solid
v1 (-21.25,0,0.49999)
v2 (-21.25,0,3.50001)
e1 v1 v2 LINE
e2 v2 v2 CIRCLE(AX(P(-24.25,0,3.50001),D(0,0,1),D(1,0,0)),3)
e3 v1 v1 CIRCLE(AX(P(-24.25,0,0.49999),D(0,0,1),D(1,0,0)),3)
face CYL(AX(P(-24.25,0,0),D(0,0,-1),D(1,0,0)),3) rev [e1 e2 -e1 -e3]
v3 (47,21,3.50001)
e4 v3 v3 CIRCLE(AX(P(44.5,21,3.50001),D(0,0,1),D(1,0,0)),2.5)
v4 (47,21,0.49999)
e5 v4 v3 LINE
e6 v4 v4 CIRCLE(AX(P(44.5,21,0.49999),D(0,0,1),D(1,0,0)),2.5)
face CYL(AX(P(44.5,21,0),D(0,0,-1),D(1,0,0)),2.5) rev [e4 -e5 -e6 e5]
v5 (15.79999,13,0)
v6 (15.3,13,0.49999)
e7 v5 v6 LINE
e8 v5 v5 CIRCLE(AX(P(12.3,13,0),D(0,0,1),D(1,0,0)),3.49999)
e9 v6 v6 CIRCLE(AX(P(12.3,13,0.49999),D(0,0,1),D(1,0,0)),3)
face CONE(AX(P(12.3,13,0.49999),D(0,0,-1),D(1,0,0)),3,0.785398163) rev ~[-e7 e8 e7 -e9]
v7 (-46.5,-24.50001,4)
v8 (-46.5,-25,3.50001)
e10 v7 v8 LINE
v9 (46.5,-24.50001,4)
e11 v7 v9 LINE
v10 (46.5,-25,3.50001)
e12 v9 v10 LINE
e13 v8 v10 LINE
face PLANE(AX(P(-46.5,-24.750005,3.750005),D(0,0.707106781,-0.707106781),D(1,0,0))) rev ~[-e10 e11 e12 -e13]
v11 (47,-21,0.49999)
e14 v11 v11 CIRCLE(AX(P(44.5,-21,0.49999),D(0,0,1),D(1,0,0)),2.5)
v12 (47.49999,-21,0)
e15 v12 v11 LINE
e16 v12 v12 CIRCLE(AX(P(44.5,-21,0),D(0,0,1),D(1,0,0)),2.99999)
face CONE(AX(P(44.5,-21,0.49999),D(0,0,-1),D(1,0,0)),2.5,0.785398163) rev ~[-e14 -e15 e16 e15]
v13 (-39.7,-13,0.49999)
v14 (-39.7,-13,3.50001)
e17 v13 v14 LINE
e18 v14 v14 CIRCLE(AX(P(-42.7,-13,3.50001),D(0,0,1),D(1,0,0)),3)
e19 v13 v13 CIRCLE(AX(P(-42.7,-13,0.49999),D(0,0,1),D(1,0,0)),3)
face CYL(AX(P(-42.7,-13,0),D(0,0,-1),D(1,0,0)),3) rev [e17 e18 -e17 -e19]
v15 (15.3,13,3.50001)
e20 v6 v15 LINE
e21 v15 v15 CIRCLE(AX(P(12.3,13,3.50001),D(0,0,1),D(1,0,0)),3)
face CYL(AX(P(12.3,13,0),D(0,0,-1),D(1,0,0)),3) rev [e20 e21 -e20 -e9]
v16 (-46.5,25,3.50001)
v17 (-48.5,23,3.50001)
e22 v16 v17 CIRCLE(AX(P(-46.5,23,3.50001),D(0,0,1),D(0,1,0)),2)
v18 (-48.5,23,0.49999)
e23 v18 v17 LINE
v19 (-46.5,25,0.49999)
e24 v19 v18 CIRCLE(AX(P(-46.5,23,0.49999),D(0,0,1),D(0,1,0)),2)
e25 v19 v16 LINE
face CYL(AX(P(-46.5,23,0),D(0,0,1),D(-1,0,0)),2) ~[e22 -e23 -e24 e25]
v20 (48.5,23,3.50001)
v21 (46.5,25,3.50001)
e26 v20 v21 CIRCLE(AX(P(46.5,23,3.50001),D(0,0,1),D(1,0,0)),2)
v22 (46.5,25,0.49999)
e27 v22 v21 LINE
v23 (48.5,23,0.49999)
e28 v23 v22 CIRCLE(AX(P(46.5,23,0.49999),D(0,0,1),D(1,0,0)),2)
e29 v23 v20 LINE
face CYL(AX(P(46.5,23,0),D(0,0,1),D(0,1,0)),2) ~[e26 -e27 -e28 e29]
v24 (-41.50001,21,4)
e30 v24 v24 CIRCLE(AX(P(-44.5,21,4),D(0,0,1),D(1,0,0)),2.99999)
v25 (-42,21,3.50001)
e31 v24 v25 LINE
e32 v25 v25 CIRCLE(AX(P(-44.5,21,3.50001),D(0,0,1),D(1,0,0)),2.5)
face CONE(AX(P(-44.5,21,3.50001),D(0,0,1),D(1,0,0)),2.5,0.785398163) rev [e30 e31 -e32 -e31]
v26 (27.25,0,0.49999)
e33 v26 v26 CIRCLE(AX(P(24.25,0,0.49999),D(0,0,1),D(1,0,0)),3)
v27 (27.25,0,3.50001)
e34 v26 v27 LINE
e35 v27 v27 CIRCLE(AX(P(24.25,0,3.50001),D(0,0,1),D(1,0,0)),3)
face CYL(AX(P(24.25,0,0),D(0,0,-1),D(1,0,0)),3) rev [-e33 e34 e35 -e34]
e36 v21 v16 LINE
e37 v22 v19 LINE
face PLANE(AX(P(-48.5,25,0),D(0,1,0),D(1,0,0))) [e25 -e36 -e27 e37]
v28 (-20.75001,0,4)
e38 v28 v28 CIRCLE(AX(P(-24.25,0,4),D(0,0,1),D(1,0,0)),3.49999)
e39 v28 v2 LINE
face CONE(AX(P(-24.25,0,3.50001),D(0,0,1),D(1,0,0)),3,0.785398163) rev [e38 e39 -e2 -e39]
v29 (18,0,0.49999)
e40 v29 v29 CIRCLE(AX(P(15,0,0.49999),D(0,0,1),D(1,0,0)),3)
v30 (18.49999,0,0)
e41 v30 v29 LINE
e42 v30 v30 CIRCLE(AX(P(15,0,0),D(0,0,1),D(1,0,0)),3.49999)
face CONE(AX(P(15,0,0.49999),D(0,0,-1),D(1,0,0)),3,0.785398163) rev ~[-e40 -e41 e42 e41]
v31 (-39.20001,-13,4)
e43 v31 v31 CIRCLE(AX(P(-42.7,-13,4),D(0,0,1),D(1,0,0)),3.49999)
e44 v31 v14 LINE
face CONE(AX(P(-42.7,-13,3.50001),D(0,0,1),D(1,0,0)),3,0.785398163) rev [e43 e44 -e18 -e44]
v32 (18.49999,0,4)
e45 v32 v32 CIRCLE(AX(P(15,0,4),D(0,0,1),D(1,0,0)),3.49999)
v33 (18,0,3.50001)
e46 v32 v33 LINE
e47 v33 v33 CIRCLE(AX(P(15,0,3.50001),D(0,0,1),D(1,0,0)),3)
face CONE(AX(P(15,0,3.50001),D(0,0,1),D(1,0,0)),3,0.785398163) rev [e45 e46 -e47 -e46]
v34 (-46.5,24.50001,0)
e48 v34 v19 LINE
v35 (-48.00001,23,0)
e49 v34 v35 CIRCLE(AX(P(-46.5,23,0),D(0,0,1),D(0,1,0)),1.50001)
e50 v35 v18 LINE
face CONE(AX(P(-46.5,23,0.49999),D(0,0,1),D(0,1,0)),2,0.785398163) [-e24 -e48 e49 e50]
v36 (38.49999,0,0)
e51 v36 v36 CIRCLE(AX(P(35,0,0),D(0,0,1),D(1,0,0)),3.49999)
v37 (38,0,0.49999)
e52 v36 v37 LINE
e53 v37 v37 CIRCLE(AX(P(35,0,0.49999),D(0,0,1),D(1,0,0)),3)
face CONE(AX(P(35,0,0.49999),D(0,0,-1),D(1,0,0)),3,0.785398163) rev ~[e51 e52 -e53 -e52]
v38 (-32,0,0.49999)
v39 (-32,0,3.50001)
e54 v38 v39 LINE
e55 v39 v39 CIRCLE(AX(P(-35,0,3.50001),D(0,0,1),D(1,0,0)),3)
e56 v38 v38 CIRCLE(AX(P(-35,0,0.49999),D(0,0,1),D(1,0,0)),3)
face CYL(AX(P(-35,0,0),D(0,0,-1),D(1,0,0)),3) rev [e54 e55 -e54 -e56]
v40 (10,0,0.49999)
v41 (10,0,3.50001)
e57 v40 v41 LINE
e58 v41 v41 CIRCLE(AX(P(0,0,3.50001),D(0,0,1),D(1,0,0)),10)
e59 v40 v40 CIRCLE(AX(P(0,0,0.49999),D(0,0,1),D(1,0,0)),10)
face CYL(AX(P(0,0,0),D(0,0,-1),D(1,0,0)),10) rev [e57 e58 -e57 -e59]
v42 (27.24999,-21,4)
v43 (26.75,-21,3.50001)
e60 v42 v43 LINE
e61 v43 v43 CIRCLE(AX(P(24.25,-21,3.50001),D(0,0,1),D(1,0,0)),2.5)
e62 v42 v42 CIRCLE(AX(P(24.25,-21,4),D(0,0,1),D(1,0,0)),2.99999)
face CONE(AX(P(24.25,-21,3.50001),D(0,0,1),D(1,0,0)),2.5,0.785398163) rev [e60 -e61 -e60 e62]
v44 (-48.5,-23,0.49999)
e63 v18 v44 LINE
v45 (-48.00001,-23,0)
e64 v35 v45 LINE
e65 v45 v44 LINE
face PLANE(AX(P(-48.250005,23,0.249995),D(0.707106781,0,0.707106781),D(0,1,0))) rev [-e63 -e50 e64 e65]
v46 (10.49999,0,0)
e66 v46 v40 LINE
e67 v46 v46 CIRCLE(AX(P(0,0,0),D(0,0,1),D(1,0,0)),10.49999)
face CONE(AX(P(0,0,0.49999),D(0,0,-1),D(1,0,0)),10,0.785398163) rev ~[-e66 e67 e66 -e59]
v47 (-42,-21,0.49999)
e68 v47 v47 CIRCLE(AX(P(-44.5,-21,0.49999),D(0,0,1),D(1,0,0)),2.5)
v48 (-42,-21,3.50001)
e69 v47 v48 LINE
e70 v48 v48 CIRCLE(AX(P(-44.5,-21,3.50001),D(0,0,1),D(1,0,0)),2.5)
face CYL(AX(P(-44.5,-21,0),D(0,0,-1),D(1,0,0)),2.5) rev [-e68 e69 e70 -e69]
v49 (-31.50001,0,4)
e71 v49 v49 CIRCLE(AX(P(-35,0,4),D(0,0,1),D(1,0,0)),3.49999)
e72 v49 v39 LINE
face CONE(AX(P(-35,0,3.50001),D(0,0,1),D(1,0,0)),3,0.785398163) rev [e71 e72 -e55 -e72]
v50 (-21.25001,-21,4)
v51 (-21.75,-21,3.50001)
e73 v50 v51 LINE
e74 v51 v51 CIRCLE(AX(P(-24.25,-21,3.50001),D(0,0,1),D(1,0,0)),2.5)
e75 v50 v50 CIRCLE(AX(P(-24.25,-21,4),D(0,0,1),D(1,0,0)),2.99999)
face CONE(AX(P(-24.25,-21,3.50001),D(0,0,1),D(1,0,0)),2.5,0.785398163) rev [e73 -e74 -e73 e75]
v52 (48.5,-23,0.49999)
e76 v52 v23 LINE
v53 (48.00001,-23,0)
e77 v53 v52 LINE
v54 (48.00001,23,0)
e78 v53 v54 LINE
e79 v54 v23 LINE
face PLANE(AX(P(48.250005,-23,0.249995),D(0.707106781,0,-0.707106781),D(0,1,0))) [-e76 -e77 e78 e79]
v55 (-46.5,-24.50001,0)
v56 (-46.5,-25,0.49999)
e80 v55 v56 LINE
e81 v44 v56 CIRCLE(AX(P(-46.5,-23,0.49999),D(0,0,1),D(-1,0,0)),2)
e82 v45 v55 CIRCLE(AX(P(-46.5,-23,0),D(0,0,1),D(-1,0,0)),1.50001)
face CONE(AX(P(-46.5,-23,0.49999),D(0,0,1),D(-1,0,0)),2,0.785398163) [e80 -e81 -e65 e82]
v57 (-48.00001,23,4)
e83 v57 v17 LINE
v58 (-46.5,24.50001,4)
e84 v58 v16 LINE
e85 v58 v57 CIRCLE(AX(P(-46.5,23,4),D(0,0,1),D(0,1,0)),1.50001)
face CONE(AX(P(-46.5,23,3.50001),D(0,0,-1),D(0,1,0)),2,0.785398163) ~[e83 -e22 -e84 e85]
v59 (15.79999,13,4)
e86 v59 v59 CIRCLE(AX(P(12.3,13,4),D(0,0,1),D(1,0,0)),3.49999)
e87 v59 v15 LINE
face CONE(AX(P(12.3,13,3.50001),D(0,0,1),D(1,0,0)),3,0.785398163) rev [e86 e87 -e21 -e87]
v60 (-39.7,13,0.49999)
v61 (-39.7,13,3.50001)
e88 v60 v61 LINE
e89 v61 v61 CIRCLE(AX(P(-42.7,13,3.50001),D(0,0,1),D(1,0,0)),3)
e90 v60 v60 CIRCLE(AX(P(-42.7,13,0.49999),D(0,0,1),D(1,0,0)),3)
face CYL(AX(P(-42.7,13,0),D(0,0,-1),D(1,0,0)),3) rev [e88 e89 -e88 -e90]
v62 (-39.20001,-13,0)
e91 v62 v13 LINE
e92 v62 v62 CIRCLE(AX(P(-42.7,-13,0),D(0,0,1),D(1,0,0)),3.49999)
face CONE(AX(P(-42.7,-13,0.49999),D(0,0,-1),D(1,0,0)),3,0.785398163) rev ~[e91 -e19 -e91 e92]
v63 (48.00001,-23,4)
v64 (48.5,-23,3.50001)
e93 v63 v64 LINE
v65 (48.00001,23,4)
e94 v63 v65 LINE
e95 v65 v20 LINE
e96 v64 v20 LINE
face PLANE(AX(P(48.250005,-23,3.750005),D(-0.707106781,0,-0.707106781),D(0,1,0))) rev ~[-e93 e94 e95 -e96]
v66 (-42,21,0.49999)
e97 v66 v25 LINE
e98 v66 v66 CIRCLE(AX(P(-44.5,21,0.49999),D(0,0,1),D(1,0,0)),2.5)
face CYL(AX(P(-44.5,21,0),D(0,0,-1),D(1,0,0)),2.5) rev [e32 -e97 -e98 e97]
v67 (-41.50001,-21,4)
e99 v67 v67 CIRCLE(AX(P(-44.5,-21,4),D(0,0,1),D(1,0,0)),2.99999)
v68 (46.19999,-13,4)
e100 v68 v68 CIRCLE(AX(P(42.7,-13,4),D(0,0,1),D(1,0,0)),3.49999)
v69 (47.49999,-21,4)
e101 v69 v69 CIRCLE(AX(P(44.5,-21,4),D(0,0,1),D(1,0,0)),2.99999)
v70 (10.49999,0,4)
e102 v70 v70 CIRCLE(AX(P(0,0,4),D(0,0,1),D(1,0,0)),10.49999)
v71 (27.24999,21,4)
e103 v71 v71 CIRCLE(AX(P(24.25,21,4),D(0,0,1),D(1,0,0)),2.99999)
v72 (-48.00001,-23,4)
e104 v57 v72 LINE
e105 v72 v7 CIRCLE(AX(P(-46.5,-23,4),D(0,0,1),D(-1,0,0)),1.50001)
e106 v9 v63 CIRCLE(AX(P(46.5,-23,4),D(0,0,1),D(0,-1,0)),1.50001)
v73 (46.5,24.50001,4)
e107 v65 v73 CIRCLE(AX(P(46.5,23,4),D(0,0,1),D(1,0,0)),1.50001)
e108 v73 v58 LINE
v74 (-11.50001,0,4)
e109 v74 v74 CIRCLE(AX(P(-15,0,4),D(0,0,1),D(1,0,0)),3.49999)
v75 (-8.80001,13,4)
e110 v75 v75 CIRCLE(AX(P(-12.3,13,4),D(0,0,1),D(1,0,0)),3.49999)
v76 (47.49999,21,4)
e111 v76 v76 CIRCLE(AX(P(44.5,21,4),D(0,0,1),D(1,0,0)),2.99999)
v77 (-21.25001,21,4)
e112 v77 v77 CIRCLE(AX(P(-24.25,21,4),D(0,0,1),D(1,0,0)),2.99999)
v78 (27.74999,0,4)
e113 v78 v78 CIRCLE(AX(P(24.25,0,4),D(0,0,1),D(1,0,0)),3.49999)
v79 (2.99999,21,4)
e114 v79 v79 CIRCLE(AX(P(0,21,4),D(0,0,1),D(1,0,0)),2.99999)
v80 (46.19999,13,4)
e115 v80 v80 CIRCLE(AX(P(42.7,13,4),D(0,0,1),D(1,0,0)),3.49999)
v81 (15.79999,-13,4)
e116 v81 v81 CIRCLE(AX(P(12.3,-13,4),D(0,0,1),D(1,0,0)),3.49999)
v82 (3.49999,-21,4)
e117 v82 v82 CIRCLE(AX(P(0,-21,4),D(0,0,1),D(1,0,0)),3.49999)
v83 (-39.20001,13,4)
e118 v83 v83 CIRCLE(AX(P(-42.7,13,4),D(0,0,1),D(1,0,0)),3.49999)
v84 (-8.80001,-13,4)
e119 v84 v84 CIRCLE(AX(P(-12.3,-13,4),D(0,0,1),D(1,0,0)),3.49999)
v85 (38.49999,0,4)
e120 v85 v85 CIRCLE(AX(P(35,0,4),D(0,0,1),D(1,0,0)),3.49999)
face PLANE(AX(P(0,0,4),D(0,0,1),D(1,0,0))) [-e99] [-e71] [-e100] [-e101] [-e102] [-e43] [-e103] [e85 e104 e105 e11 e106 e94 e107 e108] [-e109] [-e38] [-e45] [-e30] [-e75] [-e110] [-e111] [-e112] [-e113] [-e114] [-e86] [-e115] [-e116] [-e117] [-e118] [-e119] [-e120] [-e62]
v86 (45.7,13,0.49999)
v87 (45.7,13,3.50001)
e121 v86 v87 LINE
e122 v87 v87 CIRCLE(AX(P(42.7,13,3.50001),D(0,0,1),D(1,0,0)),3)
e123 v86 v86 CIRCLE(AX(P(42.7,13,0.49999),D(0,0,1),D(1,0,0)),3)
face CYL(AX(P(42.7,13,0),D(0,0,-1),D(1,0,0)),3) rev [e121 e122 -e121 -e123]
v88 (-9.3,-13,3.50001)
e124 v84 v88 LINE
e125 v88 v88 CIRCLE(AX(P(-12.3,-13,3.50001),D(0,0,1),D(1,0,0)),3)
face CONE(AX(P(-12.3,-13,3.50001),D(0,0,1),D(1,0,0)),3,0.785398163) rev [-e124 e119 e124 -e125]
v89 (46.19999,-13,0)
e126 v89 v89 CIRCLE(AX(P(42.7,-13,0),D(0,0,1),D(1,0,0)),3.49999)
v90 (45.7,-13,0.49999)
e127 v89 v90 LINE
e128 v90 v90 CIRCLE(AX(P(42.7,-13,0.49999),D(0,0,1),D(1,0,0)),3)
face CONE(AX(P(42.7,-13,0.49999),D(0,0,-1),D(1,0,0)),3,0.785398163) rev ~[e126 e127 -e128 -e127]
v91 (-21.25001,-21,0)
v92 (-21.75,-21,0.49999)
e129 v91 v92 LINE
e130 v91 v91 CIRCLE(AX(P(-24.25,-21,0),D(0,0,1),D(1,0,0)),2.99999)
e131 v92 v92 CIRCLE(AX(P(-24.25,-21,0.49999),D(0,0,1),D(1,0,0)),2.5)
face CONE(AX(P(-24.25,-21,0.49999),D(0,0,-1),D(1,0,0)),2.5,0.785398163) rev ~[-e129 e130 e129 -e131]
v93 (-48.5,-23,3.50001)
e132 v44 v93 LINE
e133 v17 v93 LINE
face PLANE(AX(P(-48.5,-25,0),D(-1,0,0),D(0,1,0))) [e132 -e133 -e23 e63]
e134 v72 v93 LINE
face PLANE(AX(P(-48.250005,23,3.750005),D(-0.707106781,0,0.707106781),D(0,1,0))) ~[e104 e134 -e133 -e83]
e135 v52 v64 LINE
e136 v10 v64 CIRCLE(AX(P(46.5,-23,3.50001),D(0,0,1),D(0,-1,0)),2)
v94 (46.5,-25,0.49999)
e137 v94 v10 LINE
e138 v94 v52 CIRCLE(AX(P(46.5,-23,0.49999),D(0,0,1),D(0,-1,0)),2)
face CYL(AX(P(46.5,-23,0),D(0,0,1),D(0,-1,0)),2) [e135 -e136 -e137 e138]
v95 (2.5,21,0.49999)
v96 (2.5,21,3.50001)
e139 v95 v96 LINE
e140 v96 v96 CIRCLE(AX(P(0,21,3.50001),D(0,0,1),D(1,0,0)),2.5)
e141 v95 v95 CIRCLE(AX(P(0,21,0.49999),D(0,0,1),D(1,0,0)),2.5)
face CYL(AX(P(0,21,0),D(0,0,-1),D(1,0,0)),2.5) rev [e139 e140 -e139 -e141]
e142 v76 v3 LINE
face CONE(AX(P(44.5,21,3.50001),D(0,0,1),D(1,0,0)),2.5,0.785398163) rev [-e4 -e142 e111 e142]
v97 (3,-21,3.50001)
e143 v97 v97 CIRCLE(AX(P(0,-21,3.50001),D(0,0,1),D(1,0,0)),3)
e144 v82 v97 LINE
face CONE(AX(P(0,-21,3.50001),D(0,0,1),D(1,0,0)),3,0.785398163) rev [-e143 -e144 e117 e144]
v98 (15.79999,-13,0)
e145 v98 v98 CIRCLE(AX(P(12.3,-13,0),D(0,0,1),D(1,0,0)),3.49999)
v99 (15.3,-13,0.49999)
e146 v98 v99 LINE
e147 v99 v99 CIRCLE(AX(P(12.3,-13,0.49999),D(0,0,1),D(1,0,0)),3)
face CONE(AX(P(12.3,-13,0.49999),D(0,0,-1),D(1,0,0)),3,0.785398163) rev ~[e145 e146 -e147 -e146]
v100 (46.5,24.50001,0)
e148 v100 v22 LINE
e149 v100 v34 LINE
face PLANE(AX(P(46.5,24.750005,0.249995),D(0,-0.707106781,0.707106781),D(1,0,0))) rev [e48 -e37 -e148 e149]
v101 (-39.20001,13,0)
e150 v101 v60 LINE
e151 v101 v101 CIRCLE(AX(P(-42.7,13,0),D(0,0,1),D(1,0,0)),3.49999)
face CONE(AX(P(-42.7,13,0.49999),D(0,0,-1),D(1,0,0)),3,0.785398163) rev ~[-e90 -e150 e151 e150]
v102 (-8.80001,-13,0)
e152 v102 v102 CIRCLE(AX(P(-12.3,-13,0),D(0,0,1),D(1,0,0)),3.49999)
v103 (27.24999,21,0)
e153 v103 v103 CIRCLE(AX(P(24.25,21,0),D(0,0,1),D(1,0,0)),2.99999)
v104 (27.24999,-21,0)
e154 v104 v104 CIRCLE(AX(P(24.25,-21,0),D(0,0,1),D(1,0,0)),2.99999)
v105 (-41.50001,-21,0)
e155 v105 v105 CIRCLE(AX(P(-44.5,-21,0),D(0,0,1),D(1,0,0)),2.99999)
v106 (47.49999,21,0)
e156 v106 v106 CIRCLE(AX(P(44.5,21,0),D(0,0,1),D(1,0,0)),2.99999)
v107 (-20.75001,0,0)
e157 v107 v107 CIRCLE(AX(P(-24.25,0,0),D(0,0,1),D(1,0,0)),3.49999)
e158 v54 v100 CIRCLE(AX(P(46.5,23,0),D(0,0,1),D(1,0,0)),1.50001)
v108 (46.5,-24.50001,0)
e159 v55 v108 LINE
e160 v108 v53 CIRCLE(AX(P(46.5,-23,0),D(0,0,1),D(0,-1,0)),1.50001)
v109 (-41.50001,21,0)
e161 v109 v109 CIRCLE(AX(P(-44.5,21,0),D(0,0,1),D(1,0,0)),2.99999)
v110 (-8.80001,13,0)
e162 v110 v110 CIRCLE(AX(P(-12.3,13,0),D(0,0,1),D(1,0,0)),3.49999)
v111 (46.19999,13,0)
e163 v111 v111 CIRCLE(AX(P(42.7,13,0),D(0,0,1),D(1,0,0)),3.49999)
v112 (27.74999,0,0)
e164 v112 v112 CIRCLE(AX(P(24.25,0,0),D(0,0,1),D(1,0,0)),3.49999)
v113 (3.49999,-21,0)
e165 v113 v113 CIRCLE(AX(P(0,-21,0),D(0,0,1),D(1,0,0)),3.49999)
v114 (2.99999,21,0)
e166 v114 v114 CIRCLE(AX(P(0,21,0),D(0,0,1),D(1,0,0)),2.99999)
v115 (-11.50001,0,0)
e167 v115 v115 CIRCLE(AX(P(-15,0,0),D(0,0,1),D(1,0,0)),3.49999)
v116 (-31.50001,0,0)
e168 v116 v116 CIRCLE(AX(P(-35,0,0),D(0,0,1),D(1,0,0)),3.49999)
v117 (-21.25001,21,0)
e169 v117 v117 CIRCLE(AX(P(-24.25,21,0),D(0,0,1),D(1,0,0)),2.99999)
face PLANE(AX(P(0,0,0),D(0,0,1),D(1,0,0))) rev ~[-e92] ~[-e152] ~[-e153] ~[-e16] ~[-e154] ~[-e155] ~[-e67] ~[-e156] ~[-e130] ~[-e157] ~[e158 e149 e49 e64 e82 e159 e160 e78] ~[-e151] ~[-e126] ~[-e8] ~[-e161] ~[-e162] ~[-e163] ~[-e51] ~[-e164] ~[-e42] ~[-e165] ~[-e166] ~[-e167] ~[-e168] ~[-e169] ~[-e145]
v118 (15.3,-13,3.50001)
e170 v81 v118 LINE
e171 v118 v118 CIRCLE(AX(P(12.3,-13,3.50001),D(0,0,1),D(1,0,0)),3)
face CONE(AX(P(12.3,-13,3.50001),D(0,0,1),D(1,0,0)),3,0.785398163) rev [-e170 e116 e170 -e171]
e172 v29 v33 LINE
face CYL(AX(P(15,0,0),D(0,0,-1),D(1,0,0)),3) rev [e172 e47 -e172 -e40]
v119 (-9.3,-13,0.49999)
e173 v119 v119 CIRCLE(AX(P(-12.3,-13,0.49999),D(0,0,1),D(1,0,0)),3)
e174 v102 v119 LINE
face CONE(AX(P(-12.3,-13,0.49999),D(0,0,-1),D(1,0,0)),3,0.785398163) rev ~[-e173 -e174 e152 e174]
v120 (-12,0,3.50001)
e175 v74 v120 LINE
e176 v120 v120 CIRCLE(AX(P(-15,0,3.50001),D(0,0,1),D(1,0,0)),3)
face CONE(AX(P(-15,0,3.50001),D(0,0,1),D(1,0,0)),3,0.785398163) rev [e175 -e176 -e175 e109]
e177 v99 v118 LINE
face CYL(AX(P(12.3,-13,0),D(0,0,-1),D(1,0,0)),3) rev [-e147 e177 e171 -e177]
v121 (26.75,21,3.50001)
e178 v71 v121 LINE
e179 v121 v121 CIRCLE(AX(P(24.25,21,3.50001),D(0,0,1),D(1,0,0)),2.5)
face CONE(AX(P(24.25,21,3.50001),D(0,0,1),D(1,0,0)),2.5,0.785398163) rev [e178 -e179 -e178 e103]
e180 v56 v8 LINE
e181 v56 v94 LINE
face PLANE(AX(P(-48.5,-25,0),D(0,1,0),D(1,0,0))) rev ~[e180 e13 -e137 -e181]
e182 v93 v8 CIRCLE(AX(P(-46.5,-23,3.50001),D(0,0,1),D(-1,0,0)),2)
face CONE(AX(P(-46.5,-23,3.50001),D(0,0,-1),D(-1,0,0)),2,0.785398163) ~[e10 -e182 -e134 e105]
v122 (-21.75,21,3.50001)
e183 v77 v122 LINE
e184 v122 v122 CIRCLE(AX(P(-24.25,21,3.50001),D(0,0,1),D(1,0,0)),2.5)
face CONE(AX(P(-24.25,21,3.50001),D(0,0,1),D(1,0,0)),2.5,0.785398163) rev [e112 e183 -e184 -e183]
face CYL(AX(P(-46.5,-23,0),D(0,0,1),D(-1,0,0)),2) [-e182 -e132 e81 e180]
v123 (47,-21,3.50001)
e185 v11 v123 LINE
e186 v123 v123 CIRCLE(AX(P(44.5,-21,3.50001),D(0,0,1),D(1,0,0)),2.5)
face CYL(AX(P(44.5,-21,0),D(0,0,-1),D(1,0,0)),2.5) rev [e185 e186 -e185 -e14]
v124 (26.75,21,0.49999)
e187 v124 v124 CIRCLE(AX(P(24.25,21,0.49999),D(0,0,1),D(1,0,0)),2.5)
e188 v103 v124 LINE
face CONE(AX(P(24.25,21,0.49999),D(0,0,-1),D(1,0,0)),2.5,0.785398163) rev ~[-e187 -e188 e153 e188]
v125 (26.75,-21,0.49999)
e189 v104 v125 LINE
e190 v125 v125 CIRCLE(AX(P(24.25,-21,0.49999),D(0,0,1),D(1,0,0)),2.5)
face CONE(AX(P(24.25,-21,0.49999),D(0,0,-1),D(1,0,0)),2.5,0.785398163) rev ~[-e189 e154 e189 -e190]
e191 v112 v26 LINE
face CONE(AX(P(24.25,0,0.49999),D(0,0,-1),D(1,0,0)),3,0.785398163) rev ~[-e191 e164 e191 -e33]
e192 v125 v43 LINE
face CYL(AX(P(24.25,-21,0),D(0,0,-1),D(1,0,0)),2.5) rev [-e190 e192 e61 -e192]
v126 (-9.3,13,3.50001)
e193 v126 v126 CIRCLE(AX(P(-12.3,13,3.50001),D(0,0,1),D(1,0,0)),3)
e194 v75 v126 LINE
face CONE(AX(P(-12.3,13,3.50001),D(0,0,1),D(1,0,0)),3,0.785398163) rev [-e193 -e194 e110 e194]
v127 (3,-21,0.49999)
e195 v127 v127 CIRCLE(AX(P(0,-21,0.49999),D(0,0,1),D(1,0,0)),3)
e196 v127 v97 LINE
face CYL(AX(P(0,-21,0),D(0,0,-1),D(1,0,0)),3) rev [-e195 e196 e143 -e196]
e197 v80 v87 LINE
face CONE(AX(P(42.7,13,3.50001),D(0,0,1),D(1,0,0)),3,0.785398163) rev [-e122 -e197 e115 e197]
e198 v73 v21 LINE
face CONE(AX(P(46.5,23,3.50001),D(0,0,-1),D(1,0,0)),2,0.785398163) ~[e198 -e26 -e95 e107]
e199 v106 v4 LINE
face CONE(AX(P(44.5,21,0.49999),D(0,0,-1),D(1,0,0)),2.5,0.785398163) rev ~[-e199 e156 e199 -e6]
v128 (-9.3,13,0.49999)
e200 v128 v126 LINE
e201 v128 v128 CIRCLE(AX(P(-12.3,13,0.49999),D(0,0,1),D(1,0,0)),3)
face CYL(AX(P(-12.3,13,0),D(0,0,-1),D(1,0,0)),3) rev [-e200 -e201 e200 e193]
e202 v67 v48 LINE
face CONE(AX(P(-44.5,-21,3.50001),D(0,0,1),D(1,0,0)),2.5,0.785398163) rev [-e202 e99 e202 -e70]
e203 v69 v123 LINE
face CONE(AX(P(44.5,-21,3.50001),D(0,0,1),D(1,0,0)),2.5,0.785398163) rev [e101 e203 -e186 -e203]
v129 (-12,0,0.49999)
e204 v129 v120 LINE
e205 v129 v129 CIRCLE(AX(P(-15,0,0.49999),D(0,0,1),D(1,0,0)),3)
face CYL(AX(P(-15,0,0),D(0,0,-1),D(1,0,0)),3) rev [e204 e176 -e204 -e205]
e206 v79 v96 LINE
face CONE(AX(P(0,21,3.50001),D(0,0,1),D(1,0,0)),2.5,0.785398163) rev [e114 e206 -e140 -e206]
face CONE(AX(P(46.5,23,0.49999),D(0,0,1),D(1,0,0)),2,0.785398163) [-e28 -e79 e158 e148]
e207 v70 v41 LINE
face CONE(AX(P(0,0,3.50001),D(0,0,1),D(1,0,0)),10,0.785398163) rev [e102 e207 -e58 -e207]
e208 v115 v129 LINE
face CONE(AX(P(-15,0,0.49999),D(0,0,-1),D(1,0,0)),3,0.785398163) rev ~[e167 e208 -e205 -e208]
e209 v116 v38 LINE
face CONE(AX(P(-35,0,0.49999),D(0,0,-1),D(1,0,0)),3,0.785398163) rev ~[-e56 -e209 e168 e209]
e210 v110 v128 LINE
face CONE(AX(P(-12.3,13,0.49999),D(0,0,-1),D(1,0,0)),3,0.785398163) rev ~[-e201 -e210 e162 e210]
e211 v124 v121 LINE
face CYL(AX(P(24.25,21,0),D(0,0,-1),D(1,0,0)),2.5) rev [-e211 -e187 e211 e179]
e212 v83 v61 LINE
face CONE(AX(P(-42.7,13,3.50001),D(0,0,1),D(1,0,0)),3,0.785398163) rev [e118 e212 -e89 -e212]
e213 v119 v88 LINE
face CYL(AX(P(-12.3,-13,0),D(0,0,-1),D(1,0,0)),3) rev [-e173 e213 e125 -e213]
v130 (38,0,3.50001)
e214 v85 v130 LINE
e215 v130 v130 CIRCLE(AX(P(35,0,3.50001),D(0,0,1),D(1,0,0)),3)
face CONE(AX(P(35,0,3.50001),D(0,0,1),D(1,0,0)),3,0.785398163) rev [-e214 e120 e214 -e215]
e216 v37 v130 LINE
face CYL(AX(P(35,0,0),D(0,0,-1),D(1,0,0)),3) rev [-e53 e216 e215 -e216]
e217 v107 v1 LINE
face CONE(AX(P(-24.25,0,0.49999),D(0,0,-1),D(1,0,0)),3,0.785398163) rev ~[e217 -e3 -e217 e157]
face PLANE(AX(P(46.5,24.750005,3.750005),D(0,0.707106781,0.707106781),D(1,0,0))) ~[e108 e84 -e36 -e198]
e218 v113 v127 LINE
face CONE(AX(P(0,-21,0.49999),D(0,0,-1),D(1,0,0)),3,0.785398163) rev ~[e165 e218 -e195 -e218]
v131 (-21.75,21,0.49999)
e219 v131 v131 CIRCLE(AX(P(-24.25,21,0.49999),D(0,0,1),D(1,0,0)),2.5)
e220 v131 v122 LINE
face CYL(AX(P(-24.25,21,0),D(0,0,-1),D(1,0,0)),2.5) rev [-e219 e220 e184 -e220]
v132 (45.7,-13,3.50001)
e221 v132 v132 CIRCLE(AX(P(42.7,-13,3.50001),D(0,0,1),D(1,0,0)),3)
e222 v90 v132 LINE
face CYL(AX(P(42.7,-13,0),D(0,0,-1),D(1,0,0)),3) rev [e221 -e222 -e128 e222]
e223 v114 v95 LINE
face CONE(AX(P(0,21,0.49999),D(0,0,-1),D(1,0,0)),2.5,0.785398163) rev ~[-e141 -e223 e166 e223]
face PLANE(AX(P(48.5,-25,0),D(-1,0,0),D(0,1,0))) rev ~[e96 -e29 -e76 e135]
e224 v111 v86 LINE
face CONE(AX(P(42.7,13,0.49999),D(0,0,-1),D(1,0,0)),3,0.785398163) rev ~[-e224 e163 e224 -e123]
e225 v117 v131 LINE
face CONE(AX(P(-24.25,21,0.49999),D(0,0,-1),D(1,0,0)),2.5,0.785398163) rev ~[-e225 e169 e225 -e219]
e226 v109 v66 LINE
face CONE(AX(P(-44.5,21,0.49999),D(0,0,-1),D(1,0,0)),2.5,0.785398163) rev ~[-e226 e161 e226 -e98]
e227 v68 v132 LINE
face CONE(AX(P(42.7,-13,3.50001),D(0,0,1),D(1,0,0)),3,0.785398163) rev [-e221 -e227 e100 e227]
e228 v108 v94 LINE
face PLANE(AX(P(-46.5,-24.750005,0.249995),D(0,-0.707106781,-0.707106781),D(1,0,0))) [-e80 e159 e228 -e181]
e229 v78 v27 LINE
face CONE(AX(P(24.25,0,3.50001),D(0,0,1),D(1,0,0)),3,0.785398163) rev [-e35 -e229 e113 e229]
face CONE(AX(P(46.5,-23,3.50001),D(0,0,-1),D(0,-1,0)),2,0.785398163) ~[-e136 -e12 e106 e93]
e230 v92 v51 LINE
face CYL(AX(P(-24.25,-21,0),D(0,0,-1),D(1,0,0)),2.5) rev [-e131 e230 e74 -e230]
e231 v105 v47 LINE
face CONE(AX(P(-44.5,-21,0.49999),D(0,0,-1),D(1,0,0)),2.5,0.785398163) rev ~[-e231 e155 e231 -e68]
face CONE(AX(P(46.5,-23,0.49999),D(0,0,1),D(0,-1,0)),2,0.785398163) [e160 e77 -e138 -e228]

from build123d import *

# Parameters (mm, degrees)
F0_W     = 97
F0_H     = 50
F0_R     = 2.5
F0_R_2   = 3
F0_R_3   = 10
F1_DEPTH = 4
F2_R     = 2
F3_SIZE  = 0.49999


# Not quite as in the source:
# - a fillet or chamfer is up to 0.001 mm smaller than in the source, because OpenCascade refuses the exact size


with BuildPart() as f1:
    # F0 (on Top) → F1 (new body)
    with BuildSketch(Plane.XY):
        Rectangle(F0_W, F0_H)
        with Locations((-44.5, -21)):
            Circle(F0_R, mode=Mode.SUBTRACT)
        with Locations((-42.7, -13)):
            Circle(F0_R_2, mode=Mode.SUBTRACT)
        with Locations((-24.25, -21)):
            Circle(F0_R, mode=Mode.SUBTRACT)
        with Locations((-12.3, -13)):
            Circle(F0_R_2, mode=Mode.SUBTRACT)
        with Locations((0, -21)):
            Circle(F0_R_2, mode=Mode.SUBTRACT)
        with Locations((12.3, -13)):
            Circle(F0_R_2, mode=Mode.SUBTRACT)
        with Locations((24.25, -21)):
            Circle(F0_R, mode=Mode.SUBTRACT)
        with Locations((44.5, -21)):
            Circle(F0_R, mode=Mode.SUBTRACT)
        with Locations((42.7, -13)):
            Circle(F0_R_2, mode=Mode.SUBTRACT)
        with Locations((-35, 0)):
            Circle(F0_R_2, mode=Mode.SUBTRACT)
        with Locations((-24.25, 0)):
            Circle(F0_R_2, mode=Mode.SUBTRACT)
        with Locations((-15, 0)):
            Circle(F0_R_2, mode=Mode.SUBTRACT)
        with Locations((-42.7, 13)):
            Circle(F0_R_2, mode=Mode.SUBTRACT)
        with Locations((-44.5, 21)):
            Circle(F0_R, mode=Mode.SUBTRACT)
        with Locations((-12.3, 13)):
            Circle(F0_R_2, mode=Mode.SUBTRACT)
        with Locations((-24.25, 21)):
            Circle(F0_R, mode=Mode.SUBTRACT)
        Circle(F0_R_3, mode=Mode.SUBTRACT)
        with Locations((15, 0)):
            Circle(F0_R_2, mode=Mode.SUBTRACT)
        with Locations((24.25, 0)):
            Circle(F0_R_2, mode=Mode.SUBTRACT)
        with Locations((35, 0)):
            Circle(F0_R_2, mode=Mode.SUBTRACT)
        with Locations((12.3, 13)):
            Circle(F0_R_2, mode=Mode.SUBTRACT)
        with Locations((0, 21)):
            Circle(F0_R, mode=Mode.SUBTRACT)
        with Locations((42.7, 13)):
            Circle(F0_R_2, mode=Mode.SUBTRACT)
        with Locations((24.25, 21)):
            Circle(F0_R, mode=Mode.SUBTRACT)
        with Locations((44.5, 21)):
            Circle(F0_R, mode=Mode.SUBTRACT)
    extrude(amount=F1_DEPTH)

    # F2
    f2_edges = [f1.edges().sort_by_distance(p)[0] for p in [
        (-48.5, 25, 2),
        (-48.5, -25, 2),
        (48.5, -25, 2),
        (48.5, 25, 2),
    ]]
    fillet(f2_edges, radius=F2_R)

    # F3 (size 0.5 in the source; OpenCascade refuses exactly that, so slightly less here)
    f3_edges = [f1.edges().sort_by_distance(p)[0] for p in [
        (0, -25, 4),
        (-47.914214, -24.414214, 4),
        (47.914214, -24.414214, 4),
        (-48.5, 0, 4),
        (48.5, 0, 4),
        (-47.914214, 24.414214, 4),
        (47.914214, 24.414214, 4),
        (0, 25, 4),
        (-47, -21, 4),
        (-45.7, -13, 4),
        (-26.75, -21, 4),
        (-15.3, -13, 4),
        (-3, -21, 4),
        (9.3, -13, 4),
        (21.75, -21, 4),
        (42, -21, 4),
        (39.7, -13, 4),
        (-38, 0, 4),
        (-27.25, 0, 4),
        (-18, 0, 4),
        (-45.7, 13, 4),
        (-47, 21, 4),
        (-15.3, 13, 4),
        (-26.75, 21, 4),
        (-10, 0, 4),
        (12, 0, 4),
        (21.25, 0, 4),
        (32, 0, 4),
        (9.3, 13, 4),
        (-2.5, 21, 4),
        (39.7, 13, 4),
        (21.75, 21, 4),
        (42, 21, 4),
        (0, -25, 0),
        (-47.914214, -24.414214, 0),
        (47.914214, -24.414214, 0),
        (-48.5, 0, 0),
        (48.5, 0, 0),
        (-47.914214, 24.414214, 0),
        (47.914214, 24.414214, 0),
        (0, 25, 0),
        (-47, -21, 0),
        (-45.7, -13, 0),
        (-26.75, -21, 0),
        (-15.3, -13, 0),
        (-3, -21, 0),
        (9.3, -13, 0),
        (21.75, -21, 0),
        (42, -21, 0),
        (39.7, -13, 0),
        (-38, 0, 0),
        (-27.25, 0, 0),
        (-18, 0, 0),
        (-45.7, 13, 0),
        (-47, 21, 0),
        (-15.3, 13, 0),
        (-26.75, 21, 0),
        (-10, 0, 0),
        (12, 0, 0),
        (21.25, 0, 0),
        (32, 0, 0),
        (9.3, 13, 0),
        (-2.5, 21, 0),
        (39.7, 13, 0),
        (21.75, 21, 0),
        (42, 21, 0),
    ]]
    chamfer(f3_edges, length=F3_SIZE)


solid = f1.part
